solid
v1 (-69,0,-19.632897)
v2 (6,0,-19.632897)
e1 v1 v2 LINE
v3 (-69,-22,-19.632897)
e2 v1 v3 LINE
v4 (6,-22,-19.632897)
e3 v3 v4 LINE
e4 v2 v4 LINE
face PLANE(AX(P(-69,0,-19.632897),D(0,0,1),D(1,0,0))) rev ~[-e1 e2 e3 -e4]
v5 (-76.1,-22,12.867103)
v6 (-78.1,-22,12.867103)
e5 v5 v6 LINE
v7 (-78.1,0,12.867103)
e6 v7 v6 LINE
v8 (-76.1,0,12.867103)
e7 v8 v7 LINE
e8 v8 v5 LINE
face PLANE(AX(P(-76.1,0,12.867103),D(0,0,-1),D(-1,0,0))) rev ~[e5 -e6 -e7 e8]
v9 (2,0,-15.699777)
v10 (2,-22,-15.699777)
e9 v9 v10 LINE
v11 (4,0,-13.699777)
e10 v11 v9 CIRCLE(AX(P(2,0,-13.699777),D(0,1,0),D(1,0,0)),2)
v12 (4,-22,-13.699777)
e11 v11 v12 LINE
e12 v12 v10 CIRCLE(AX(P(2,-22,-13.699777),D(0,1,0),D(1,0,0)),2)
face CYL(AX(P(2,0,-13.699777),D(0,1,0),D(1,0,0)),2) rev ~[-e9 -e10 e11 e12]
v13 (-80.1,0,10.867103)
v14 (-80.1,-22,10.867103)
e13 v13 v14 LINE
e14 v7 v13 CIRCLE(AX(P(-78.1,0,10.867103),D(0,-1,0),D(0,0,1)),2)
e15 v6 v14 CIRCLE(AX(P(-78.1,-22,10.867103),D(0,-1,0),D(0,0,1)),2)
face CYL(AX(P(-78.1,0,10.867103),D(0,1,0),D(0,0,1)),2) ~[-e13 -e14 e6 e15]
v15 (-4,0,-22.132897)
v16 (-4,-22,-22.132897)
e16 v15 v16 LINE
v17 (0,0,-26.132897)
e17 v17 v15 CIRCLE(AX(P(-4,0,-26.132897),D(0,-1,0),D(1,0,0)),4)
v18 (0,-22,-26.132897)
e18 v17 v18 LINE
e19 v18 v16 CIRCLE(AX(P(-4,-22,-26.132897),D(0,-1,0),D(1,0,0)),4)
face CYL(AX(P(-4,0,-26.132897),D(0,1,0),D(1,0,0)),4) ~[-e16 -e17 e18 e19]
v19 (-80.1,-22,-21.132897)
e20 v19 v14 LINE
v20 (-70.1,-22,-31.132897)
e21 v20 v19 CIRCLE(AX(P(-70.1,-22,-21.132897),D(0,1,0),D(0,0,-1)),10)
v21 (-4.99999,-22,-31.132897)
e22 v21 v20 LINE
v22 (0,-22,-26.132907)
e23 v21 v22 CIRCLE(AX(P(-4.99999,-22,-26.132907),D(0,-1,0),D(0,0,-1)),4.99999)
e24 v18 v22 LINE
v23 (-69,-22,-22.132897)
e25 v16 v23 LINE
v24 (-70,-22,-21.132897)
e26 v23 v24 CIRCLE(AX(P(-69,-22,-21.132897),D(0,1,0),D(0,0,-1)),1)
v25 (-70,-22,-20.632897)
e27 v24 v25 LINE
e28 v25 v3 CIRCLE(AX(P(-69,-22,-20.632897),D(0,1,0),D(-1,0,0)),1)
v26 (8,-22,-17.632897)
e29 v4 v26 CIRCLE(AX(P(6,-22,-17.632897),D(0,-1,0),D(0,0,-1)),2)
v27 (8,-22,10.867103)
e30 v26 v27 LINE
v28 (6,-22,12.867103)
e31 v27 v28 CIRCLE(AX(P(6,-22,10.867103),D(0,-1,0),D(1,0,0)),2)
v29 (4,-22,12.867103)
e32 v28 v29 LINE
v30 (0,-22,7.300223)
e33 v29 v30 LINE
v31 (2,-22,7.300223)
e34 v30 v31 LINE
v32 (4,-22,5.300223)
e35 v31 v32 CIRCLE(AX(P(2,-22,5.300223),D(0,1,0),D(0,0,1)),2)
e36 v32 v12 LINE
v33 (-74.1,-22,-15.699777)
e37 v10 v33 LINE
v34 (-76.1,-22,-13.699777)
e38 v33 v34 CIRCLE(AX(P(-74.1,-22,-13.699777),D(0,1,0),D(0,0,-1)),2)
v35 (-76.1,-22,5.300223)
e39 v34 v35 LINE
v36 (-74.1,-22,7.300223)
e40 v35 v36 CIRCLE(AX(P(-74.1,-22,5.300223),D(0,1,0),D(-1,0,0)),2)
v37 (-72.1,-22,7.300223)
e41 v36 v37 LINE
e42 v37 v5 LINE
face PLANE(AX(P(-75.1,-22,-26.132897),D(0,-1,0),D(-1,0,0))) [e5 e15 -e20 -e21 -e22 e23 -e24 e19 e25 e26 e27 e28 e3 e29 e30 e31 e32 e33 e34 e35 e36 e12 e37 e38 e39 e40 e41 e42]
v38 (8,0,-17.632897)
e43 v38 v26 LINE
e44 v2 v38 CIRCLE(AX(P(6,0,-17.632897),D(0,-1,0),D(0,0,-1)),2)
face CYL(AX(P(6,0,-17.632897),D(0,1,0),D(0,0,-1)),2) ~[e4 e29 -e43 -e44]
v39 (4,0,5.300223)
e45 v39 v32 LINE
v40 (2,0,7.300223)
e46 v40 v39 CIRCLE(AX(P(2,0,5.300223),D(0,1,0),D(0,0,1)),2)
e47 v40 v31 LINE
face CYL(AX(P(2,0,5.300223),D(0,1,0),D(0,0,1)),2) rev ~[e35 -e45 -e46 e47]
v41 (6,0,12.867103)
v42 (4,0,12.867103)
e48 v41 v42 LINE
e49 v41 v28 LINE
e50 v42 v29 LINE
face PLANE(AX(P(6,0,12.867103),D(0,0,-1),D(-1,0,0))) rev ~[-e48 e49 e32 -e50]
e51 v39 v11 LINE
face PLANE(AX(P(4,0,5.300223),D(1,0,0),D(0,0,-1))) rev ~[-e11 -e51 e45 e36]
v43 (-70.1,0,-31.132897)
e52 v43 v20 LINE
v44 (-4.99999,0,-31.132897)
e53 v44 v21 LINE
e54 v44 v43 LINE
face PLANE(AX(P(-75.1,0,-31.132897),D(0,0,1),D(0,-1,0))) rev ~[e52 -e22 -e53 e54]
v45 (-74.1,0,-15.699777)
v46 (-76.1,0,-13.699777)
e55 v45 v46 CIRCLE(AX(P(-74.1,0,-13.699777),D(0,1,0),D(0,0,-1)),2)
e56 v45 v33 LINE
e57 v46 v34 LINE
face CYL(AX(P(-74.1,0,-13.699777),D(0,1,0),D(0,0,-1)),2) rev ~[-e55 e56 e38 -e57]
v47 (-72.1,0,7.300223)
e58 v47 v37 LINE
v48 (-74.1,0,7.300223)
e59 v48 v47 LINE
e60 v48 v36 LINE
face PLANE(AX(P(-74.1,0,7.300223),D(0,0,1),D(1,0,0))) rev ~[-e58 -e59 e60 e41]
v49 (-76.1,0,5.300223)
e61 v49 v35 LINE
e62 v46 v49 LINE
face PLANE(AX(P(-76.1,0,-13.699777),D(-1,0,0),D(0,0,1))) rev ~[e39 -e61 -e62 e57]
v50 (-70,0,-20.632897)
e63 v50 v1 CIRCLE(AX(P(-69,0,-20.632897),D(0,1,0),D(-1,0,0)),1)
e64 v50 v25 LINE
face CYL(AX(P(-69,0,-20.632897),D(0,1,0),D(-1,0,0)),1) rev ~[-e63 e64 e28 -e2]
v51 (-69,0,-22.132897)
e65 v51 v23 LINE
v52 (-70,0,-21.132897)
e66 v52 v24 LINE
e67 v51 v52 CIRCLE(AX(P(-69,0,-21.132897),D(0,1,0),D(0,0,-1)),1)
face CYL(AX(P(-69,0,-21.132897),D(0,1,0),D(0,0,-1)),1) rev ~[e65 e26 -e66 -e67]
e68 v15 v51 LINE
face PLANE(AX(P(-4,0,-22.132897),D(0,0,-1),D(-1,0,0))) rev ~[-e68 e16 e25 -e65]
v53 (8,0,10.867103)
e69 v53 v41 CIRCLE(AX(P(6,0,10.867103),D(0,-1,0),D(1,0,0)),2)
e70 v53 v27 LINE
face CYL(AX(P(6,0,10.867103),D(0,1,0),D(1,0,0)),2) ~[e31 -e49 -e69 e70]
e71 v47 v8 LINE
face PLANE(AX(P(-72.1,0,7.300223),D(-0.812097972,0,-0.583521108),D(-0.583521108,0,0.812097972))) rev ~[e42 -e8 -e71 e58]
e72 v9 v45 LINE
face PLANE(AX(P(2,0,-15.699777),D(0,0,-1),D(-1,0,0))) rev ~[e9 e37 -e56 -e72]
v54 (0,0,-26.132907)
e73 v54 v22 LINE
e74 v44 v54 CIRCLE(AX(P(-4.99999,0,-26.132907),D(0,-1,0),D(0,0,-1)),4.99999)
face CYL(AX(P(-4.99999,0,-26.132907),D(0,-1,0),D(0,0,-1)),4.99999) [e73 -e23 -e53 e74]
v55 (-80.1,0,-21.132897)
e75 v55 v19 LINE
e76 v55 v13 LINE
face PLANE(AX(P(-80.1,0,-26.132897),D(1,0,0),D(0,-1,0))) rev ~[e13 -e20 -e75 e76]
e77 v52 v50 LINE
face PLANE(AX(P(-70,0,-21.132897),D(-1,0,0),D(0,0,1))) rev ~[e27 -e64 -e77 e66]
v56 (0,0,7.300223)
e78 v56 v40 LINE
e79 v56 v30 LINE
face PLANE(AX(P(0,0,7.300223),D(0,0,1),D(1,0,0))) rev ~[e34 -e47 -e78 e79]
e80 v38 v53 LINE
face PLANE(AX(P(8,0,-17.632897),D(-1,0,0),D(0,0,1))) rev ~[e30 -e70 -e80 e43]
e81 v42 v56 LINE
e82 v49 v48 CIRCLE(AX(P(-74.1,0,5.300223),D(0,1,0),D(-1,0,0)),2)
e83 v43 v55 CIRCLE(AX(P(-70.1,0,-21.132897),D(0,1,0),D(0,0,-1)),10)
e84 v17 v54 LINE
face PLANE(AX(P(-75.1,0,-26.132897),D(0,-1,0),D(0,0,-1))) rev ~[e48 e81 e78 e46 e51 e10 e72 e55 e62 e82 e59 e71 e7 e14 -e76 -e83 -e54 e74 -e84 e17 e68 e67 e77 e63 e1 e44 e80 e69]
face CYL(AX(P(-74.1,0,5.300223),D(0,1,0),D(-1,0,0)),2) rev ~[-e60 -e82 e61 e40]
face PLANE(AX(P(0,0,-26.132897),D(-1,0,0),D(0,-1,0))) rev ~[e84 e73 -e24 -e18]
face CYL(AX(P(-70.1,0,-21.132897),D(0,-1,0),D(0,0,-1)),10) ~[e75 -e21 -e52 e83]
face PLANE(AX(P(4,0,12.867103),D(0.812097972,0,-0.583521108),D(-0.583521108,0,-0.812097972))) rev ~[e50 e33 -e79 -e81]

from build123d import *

# Parameters (mm, degrees)
F1_DEPTH = 22
F2_DEPTH = 5
F3_DEPTH = 5
F4_DEPTH = 5
F5_R     = 10
F6_R     = 4.99999


# Not quite as in the source:
# - a fillet or chamfer is up to 0.001 mm smaller than in the source, because OpenCascade refuses the exact size


with BuildPart() as f1:
    # F0 (on Front) → F1 (new body)
    with BuildSketch(Plane.XZ):
        with BuildLine():
            Line((-80.1, 10.8671029838), (-80.1, -15.1328970162))
            Line((-80.1, -15.1328970162), (-80.1, -21.1328970162))
            ThreePointArc((-80.1, -21.1328970162), (-78.6355339059, -24.6684309221), (-75.1, -26.1328970162))
            Line((-75.1, -26.1328970162), (0, -26.1328970162))
            ThreePointArc((0, -26.1328970162), (-1.1715728753, -23.3044698915), (-4, -22.1328970162))
            Line((-4, -22.1328970162), (-69, -22.1328970162))
            ThreePointArc((-69, -22.1328970162), (-69.7071067812, -21.8400037974), (-70, -21.1328970162))
            Line((-70, -21.1328970162), (-70, -20.6328970162))
            ThreePointArc((-70, -20.6328970162), (-69.7071067812, -19.925790235), (-69, -19.6328970162))
            Line((-69, -19.6328970162), (6, -19.6328970162))
            ThreePointArc((6, -19.6328970162), (7.4142135624, -19.0471105786), (8, -17.6328970162))
            Line((8, -17.6328970162), (8, 10.8671029838))
            ThreePointArc((8, 10.8671029838), (7.4142135624, 12.2813165462), (6, 12.8671029838))
            Line((6, 12.8671029838), (4, 12.8671029838))
            Line((4, 12.8671029838), (0, 7.3002231531))
            Line((0, 7.3002231531), (2, 7.3002231531))
            ThreePointArc((2, 7.3002231531), (3.4142135624, 6.7144367155), (4, 5.3002231531))
            Line((4, 5.3002231531), (4, -13.6997768469))
            ThreePointArc((4, -13.6997768469), (3.4142135624, -15.1139904093), (2, -15.6997768469))
            Line((2, -15.6997768469), (-74.1, -15.6997768469))
            ThreePointArc((-74.1, -15.6997768469), (-75.5142135624, -15.1139904093), (-76.1, -13.6997768469))
            Line((-76.1, -13.6997768469), (-76.1, 5.3002231531))
            ThreePointArc((-76.1, 5.3002231531), (-75.5142135624, 6.7144367155), (-74.1, 7.3002231531))
            Line((-74.1, 7.3002231531), (-72.1, 7.3002231531))
            Line((-72.1, 7.3002231531), (-76.1, 12.8671029838))
            Line((-76.1, 12.8671029838), (-78.1, 12.8671029838))
            ThreePointArc((-78.1, 12.8671029838), (-79.5142135624, 12.2813165462), (-80.1, 10.8671029838))
        make_face()
    extrude(amount=F1_DEPTH)

    # F2 (add): a face of the model
    f2_faces = [f1.faces().sort_by_distance(p)[0] for p in [
        (-37.55, -11, -26.1328970162),
    ]]
    extrude(f2_faces, amount=F2_DEPTH)

    # F3 (add, through all): a face of the model
    f3_faces = [f1.faces().sort_by_distance(p)[0] for p in [
        (-75.1, -11, -28.6328970162),
    ]]
    extrude(f3_faces, amount=F3_DEPTH)

    # F4 (add): a face of the model
    f4_faces = [f1.faces().sort_by_distance(p)[0] for p in [
        (-77.6, -11, -26.1328970162),
    ]]
    extrude(f4_faces, amount=F4_DEPTH)

    # F5
    f5_edges = [f1.edges().sort_by_distance(p)[0] for p in [
        (-80.1, -11, -31.132897),
    ]]
    fillet(f5_edges, radius=F5_R)

    # F6 (radius 5 in the source; OpenCascade refuses exactly that, so slightly less here)
    f6_edges = [f1.edges().sort_by_distance(p)[0] for p in [
        (0, -11, -31.132897),
    ]]
    fillet(f6_edges, radius=F6_R)


solid = f1.part
